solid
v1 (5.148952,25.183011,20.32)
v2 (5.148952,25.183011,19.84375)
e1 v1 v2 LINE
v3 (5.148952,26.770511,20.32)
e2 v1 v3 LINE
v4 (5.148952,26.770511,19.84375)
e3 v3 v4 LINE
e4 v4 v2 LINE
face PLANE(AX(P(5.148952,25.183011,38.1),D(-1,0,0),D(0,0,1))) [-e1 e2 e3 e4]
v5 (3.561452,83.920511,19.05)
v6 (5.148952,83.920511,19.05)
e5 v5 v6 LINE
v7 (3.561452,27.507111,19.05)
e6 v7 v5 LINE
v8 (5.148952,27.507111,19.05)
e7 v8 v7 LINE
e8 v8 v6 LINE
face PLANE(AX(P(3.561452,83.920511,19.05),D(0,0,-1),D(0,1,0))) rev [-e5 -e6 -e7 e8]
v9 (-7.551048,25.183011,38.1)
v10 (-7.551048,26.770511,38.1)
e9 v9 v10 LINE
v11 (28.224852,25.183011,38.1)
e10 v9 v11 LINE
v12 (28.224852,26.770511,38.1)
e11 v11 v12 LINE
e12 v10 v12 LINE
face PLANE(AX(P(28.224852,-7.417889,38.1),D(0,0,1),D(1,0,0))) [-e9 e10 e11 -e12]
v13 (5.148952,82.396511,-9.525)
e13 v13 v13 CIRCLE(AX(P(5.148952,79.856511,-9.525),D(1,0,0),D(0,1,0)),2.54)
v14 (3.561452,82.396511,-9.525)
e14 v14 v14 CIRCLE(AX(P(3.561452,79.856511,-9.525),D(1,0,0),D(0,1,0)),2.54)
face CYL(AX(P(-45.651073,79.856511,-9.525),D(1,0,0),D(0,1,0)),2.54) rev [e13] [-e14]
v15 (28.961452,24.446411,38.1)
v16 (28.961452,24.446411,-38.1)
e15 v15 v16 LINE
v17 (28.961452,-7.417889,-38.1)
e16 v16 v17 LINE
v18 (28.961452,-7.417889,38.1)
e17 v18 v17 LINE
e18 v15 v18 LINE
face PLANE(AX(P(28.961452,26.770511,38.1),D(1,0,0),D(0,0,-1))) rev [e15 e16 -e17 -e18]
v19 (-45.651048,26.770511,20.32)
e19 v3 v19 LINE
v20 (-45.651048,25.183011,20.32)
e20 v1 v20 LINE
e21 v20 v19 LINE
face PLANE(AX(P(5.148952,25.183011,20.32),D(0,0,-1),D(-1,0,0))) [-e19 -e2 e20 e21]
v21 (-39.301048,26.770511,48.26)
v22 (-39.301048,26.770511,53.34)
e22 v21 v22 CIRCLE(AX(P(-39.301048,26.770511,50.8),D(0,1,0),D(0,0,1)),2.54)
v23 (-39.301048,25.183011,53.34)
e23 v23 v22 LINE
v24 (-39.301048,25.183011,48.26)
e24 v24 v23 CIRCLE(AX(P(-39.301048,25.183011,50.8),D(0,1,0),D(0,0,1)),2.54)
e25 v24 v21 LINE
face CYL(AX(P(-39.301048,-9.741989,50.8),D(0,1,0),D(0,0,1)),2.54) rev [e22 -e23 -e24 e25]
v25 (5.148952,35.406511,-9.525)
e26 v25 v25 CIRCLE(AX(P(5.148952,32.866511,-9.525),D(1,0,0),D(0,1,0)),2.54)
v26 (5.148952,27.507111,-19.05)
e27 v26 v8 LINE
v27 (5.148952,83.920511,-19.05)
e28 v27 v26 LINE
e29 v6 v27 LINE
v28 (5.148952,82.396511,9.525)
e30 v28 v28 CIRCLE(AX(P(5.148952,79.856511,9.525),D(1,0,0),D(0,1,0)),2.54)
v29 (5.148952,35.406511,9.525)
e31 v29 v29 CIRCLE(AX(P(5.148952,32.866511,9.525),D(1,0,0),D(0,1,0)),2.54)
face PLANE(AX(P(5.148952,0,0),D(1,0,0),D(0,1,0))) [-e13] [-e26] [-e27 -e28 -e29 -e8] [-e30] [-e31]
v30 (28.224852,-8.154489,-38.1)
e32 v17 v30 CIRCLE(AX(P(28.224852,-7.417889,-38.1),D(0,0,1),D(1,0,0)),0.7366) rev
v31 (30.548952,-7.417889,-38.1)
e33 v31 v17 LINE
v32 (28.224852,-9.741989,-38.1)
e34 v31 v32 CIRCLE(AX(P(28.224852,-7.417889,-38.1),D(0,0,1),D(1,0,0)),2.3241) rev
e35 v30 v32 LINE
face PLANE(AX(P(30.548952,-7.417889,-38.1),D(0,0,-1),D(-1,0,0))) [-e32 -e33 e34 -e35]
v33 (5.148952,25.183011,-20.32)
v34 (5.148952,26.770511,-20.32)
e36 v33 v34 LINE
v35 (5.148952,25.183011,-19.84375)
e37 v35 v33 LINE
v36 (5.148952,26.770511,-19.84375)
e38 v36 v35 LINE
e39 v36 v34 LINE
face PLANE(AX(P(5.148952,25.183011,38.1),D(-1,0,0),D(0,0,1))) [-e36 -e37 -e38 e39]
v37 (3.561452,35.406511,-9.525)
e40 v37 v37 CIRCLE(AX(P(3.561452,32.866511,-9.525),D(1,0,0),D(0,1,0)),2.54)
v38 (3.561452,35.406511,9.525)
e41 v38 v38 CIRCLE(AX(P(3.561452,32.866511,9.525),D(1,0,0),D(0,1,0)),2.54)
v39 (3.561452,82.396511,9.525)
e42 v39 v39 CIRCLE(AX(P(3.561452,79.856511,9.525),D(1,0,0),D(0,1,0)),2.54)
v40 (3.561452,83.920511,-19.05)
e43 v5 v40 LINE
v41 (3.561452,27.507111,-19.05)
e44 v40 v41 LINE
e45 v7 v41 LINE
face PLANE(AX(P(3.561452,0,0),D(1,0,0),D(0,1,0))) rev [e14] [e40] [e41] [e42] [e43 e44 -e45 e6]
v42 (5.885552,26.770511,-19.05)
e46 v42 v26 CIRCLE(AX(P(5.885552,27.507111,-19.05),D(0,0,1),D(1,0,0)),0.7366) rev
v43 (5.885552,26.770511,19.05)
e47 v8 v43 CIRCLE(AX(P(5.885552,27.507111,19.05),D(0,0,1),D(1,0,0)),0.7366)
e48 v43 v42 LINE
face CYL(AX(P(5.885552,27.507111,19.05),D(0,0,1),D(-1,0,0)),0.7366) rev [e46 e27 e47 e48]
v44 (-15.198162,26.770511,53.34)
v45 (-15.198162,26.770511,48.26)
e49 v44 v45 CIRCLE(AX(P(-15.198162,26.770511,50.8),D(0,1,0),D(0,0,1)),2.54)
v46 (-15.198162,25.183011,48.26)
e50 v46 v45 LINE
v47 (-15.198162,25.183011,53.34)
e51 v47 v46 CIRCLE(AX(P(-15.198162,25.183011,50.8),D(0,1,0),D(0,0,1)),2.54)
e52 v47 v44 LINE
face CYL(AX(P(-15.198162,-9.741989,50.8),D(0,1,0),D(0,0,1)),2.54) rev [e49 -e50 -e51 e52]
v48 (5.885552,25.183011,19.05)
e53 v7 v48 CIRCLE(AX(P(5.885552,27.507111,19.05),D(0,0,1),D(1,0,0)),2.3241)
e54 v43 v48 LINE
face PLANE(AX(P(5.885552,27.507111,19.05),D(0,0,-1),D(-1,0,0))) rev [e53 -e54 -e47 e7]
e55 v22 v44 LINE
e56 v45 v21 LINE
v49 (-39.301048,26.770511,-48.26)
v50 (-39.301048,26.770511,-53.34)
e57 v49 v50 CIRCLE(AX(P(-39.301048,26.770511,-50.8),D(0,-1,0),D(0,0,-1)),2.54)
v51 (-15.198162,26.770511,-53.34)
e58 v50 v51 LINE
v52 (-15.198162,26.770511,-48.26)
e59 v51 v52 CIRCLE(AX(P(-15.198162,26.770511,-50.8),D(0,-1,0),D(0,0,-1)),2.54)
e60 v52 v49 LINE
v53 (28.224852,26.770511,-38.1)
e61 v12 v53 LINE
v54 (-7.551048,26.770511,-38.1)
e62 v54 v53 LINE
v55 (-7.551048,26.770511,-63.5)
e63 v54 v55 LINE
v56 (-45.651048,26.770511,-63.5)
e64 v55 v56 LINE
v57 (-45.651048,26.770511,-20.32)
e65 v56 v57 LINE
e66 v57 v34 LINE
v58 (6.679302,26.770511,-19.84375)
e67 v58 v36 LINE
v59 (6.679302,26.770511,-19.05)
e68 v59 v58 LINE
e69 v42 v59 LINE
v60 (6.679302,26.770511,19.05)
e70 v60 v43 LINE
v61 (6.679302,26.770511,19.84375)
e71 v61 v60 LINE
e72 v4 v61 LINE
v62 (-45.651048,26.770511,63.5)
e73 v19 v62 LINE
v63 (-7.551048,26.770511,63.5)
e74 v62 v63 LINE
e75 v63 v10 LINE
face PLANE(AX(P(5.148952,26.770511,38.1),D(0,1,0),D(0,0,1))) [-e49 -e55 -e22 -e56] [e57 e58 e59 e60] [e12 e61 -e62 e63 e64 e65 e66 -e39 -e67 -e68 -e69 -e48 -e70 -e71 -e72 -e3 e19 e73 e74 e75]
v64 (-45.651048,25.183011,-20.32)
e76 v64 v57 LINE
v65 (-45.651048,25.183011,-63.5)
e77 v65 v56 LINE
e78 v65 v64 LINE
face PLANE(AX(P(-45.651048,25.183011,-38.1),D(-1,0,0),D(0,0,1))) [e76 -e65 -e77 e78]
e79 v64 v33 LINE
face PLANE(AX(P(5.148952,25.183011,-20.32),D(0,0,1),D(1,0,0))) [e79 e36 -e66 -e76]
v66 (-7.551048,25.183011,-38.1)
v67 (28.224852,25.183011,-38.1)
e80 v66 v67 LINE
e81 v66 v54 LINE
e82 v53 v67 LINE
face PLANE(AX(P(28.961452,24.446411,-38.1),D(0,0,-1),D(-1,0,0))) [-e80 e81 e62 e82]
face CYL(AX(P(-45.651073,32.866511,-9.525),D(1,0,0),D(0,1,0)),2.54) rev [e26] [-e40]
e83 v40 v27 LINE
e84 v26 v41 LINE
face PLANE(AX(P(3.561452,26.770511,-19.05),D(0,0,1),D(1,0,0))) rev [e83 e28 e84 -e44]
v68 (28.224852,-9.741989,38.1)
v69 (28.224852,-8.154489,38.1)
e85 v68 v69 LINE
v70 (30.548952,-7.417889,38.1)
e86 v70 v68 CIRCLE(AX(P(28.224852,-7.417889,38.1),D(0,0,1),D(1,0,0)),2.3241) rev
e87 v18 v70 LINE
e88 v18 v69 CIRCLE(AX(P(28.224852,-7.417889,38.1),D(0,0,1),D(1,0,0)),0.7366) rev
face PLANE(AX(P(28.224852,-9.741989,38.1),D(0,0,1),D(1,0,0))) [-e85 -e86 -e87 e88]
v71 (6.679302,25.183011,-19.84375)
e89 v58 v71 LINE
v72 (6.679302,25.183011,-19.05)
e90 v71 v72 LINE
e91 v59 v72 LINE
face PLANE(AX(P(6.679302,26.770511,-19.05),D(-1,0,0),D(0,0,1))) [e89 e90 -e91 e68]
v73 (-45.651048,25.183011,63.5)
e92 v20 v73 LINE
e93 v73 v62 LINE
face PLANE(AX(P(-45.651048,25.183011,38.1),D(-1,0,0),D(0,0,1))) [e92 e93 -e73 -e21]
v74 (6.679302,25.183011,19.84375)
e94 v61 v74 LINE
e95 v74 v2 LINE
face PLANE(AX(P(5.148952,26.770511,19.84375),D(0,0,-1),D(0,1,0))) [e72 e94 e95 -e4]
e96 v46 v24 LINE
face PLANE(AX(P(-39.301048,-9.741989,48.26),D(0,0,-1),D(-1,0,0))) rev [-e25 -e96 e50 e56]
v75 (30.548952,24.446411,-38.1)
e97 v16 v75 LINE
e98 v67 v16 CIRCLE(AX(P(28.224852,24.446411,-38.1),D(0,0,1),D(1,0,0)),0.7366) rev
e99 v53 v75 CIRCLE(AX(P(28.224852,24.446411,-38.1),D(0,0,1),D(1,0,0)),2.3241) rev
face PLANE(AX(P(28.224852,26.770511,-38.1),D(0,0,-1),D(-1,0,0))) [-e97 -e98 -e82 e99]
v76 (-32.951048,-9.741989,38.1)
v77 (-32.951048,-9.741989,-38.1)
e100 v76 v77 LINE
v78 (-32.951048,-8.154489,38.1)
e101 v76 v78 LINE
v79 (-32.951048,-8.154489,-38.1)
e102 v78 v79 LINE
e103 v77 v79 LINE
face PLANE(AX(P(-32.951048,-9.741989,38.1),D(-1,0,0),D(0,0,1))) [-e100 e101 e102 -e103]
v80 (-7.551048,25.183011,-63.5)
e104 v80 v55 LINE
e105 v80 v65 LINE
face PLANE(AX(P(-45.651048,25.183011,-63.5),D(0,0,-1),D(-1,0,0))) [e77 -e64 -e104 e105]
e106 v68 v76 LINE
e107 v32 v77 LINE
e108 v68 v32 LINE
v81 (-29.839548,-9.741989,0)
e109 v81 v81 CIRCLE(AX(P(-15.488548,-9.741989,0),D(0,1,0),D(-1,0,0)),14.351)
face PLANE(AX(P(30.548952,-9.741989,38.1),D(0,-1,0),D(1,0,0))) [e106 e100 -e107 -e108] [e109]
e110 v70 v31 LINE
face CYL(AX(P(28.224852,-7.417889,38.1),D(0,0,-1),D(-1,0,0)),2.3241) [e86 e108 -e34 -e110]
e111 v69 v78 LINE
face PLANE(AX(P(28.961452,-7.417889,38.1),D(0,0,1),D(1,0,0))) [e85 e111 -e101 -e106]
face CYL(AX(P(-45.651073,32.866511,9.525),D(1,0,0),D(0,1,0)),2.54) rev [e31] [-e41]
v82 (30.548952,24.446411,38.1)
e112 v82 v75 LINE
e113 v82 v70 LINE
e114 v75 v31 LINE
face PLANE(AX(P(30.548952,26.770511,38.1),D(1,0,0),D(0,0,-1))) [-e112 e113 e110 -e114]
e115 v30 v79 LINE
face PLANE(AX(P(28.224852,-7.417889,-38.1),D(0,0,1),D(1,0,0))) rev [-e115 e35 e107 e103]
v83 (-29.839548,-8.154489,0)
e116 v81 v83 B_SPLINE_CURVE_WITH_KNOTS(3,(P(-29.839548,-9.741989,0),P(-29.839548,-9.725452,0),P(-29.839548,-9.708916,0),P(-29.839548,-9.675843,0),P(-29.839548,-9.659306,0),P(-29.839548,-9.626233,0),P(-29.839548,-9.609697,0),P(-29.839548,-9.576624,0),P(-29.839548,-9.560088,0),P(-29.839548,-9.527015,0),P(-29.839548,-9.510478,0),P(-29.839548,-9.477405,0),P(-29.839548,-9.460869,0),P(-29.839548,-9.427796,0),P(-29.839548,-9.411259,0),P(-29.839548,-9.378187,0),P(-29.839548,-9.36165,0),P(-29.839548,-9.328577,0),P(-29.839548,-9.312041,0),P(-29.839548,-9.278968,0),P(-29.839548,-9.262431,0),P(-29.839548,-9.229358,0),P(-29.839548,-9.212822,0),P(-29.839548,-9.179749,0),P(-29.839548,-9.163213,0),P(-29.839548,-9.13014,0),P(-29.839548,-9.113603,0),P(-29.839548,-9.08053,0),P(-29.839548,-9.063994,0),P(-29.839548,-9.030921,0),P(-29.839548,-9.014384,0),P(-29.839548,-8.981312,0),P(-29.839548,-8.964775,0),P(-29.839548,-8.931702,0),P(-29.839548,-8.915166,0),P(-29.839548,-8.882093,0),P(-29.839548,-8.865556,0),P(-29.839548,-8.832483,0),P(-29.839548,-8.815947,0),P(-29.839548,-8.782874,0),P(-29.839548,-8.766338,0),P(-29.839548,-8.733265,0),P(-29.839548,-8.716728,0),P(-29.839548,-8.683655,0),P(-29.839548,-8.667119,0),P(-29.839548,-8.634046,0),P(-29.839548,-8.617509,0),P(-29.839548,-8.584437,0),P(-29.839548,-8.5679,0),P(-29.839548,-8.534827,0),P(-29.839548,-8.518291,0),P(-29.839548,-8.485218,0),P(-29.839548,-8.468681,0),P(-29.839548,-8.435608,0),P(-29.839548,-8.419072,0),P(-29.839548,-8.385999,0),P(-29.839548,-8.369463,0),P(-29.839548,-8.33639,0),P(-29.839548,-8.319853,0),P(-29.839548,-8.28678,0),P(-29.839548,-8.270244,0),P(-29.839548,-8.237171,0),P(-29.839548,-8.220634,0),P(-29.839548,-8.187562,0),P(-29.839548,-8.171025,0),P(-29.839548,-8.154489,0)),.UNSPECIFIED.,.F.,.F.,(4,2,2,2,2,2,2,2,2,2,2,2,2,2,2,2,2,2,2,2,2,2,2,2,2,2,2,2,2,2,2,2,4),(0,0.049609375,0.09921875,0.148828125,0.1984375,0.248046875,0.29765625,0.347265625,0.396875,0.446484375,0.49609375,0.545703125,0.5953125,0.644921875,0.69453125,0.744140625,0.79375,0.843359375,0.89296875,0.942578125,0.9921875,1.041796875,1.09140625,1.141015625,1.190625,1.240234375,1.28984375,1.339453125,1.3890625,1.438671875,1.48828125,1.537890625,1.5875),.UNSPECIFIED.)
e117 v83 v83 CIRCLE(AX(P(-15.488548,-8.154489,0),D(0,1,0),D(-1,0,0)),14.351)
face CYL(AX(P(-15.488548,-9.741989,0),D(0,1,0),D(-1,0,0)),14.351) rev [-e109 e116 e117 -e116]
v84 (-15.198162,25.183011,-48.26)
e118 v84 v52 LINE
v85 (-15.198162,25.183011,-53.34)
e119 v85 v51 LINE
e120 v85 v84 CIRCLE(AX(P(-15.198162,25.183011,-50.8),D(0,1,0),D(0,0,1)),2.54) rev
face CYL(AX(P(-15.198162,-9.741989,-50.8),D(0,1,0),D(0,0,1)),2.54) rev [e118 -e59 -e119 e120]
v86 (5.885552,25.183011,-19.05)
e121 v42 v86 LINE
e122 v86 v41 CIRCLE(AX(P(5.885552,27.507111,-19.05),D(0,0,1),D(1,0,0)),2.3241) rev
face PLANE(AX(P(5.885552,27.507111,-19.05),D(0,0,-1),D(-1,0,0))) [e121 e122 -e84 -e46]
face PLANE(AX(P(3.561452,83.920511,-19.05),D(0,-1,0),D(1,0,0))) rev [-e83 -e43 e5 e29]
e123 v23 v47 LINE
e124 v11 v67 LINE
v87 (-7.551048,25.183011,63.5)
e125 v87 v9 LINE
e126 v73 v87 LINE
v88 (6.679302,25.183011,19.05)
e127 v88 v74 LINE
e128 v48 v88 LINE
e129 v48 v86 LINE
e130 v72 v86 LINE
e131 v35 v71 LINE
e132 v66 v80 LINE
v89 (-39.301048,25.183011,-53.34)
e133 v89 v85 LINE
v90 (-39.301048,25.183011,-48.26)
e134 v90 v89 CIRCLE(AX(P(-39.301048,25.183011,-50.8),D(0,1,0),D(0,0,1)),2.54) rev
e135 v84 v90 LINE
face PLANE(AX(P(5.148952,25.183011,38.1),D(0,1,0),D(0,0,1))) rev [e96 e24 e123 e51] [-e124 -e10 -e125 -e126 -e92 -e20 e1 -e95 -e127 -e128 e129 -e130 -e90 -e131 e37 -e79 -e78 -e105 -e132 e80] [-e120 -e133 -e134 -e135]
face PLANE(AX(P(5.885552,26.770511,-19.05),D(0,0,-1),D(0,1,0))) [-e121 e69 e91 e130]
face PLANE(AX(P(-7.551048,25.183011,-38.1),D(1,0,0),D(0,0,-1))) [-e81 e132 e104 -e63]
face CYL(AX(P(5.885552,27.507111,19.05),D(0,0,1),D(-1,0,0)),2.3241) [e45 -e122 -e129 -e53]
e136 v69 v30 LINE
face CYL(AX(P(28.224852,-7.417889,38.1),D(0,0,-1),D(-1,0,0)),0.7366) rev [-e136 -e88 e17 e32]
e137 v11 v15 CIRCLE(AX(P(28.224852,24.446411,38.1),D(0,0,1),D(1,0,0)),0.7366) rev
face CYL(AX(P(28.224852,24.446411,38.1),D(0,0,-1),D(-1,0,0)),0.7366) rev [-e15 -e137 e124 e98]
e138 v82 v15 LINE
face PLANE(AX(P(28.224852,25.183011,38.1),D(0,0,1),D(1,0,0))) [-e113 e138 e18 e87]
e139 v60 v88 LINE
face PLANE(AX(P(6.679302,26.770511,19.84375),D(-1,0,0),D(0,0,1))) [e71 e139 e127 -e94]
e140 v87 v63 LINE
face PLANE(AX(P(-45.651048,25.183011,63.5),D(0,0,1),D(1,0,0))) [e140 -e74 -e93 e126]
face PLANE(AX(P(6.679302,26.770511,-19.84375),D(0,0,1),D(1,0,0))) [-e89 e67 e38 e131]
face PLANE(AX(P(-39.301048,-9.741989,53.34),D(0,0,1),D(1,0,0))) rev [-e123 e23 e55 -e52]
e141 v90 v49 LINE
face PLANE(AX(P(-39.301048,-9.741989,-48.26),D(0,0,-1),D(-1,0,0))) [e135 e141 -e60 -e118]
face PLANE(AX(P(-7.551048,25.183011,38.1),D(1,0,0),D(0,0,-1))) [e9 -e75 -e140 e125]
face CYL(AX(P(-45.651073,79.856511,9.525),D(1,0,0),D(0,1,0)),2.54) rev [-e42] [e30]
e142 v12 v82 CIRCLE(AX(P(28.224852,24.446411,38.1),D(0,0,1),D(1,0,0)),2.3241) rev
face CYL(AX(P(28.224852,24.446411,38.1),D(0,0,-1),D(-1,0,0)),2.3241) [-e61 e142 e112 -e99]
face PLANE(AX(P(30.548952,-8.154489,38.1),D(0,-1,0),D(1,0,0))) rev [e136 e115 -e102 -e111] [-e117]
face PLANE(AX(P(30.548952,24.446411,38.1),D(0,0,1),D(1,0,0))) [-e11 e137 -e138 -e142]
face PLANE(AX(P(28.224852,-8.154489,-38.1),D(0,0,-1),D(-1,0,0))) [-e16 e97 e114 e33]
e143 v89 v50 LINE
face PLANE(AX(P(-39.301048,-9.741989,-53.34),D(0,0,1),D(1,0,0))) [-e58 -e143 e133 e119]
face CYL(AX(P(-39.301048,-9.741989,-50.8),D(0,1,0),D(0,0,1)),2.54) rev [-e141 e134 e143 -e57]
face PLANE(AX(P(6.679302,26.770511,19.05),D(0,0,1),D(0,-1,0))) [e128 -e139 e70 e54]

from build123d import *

# Parameters (mm, degrees)
BASE_FLANGE1_DEPTH            = 38.1
SKETCH4_W                     = 50.8
SKETCH4_H                     = 17.78
TAB1_DEPTH                    = 1.5875
SKETCH5_W                     = 50.8
SKETCH5_H                     = 17.78
TAB2_DEPTH                    = 1.5875
EDGE_FLANGE4_STRIP_W          = 7.8232
EDGE_FLANGE4_STRIP_H          = 1.5875
EDGE_FLANGE4_STRIP_CUT_DEPTH  = 38.1
EDGE_FLANGE4_RELIEF_W         = 8.61695
EDGE_FLANGE4_RELIEF_H         = 0.79375
EDGE_FLANGE4_RELIEF_CUT_DEPTH = 1.5875
EDGE_FLANGE4_DEPTH            = 38.1
SKETCH18_R                    = 14.351
CUT_EXTRUDE1_DEPTH            = 110.605811015
SKETCH19_W                    = 38.1
SKETCH19_H                    = 25.4
TAB3_DEPTH                    = 1.5875
SKETCH20_W                    = 38.1
SKETCH20_H                    = 25.4
TAB4_DEPTH                    = 1.5875
SKETCH21_R                    = 2.54
CUT_EXTRUDE2_DEPTH            = 117.856930597
CUT_EXTRUDE4_DEPTH            = 97.862741461


# Sheet-metal steps are written as plain solids
with BuildPart() as part:
    # Sketch1 → Base-Flange1 (new, symmetric)
    with BuildSketch(Plane.XY):
        with BuildLine():
            Line((5.148952002, 26.77051137), (28.224852002, 26.77051137))
            ThreePointArc((28.224852002, 26.77051137), (29.868238872, 26.08979824), (30.548952002, 24.44641137))
            Line((30.548952002, 24.44641137), (30.548952002, -7.41788863))
            ThreePointArc((30.548952002, -7.41788863), (29.868238872, -9.061275501), (28.224852002, -9.74198863))
            Line((28.224852002, -9.74198863), (-32.951047998, -9.74198863))
            Line((-32.951047998, -9.74198863), (-32.951047998, -8.15448863))
            Line((-32.951047998, -8.15448863), (28.224852002, -8.15448863))
            ThreePointArc((28.224852002, -8.15448863), (28.745706857, -7.938743485), (28.961452002, -7.41788863))
            Line((28.961452002, -7.41788863), (28.961452002, 24.44641137))
            ThreePointArc((28.961452002, 24.44641137), (28.745706857, 24.967266225), (28.224852002, 25.18301137))
            Line((28.224852002, 25.18301137), (5.148952002, 25.18301137))
            Line((5.148952002, 25.18301137), (5.148952002, 26.77051137))
        make_face()
    extrude(amount=BASE_FLANGE1_DEPTH, both=True)

    # Sketch4 → Tab1 (add)
    with BuildSketch(Plane(origin=(0, 26.77051137, 0), x_dir=(1, 0, 0), z_dir=(0, 1, 0))):
        with Locations((-20.251047998, -29.21)):
            Rectangle(SKETCH4_W, SKETCH4_H)
    extrude(amount=-TAB1_DEPTH)

    # Sketch5 → Tab2 (add)
    with BuildSketch(Plane(origin=(0, 26.77051137, 0), x_dir=(1, 0, 0), z_dir=(0, 1, 0))):
        with Locations((-20.251047998, 29.21)):
            Rectangle(SKETCH5_W, SKETCH5_H)
    extrude(amount=-TAB2_DEPTH)

    # Edge-Flange4 strip (across the edge) → Edge-Flange4 strip cut (cut)
    with BuildSketch(Plane(origin=(5.148952002, 26.77051137, -19.05), x_dir=(1, 0, 0), z_dir=(0, 0, 1))):
        with Locations((-3.175, -0.79375)):
            Rectangle(EDGE_FLANGE4_STRIP_W, EDGE_FLANGE4_STRIP_H)
    extrude(amount=EDGE_FLANGE4_STRIP_CUT_DEPTH, mode=Mode.SUBTRACT)

    # Edge-Flange4 relief (on the sheet) → Edge-Flange4 relief cut (cut)
    with BuildSketch(Plane(origin=(5.885552002, 26.77051137, -19.05), x_dir=(1, 0, 0), z_dir=(0, 1, 0))):
        with Locations((-3.514725, 0.396875)):
            Rectangle(EDGE_FLANGE4_RELIEF_W, EDGE_FLANGE4_RELIEF_H)
        with Locations((-3.514725, -38.496875)):
            Rectangle(EDGE_FLANGE4_RELIEF_W, EDGE_FLANGE4_RELIEF_H)
    extrude(amount=-EDGE_FLANGE4_RELIEF_CUT_DEPTH, mode=Mode.SUBTRACT)

    # Edge-Flange4 section (across the edge) → Edge-Flange4 (add)
    with BuildSketch(Plane(origin=(5.148952002, 26.77051137, -19.05), x_dir=(1, 0, 0), z_dir=(0, 0, 1))):
        with BuildLine():
            Line((-1.5875, 0.7366), (-1.5875, 57.15))
            Line((-1.5875, 57.15), (0, 57.15))
            Line((0, 57.15), (0, 0.7366))
            ThreePointArc((0, 0.7366), (0.215745145, 0.215745145), (0.7366, 0))
            Line((0.7366, 0), (0.7366, -1.5875))
            ThreePointArc((0.7366, -1.5875), (-0.90678687, -0.90678687), (-1.5875, 0.7366))
        make_face()
    extrude(amount=EDGE_FLANGE4_DEPTH)

    # Sketch18 → Cut-Extrude1 (cut, through all)
    with BuildSketch(Plane(origin=(0, -8.15448863, 0), x_dir=(1, 0, 0), z_dir=(0, 1, 0))):
        with Locations(Location((-15.488547998, 0, 0), (0, 0, 180))):
            Circle(SKETCH18_R)
    extrude(amount=-CUT_EXTRUDE1_DEPTH, mode=Mode.SUBTRACT)

    # Sketch19 → Tab3 (add)
    with BuildSketch(Plane(origin=(0, 26.77051137, 0), x_dir=(1, 0, 0), z_dir=(0, 1, 0))):
        with Locations((-26.601047998, -50.8)):
            Rectangle(SKETCH19_W, SKETCH19_H)
    extrude(amount=-TAB3_DEPTH)

    # Sketch20 → Tab4 (add)
    with BuildSketch(Plane(origin=(0, 26.77051137, 0), x_dir=(1, 0, 0), z_dir=(0, 1, 0))):
        with Locations((-26.601047998, 50.8)):
            Rectangle(SKETCH20_W, SKETCH20_H)
    extrude(amount=-TAB4_DEPTH)

    # Sketch21 → Cut-Extrude2 (cut, through all)
    with BuildSketch(Plane(origin=(5.148952002, 0, 0), x_dir=(0, 0, -1), z_dir=(1, 0, 0))):
        with Locations(Location((-9.525, 32.86651137, 0), (0, 0, 90))):
            Circle(SKETCH21_R)
        with Locations(Location((9.525, 32.86651137, 0), (0, 0, 90))):
            Circle(SKETCH21_R)
        with Locations(Location((-9.525, 79.85651137, 0), (0, 0, 90))):
            Circle(SKETCH21_R)
        with Locations(Location((9.525, 79.85651137, 0), (0, 0, 90))):
            Circle(SKETCH21_R)
    extrude(amount=-CUT_EXTRUDE2_DEPTH, mode=Mode.SUBTRACT)

    # Sketch24 → Cut-Extrude4 (cut, through all)
    with BuildSketch(Plane(origin=(0, 26.77051137, 0), x_dir=(1, 0, 0), z_dir=(0, 1, 0))):
        with BuildLine():
            Line((-39.301047998, -48.26), (-15.19816231, -48.26))
            ThreePointArc((-15.19816231, -48.26), (-12.65816231, -50.8), (-15.19816231, -53.34))
            Line((-15.19816231, -53.34), (-39.301047998, -53.34))
            ThreePointArc((-39.301047998, -53.34), (-41.841047998, -50.8), (-39.301047998, -48.26))
        make_face()
    cut_extrude4 = extrude(amount=-CUT_EXTRUDE4_DEPTH, mode=Mode.SUBTRACT)

    # Mirror1: Cut-Extrude4 across plane
    add(cut_extrude4.mirror(Plane.XY), mode=Mode.SUBTRACT)


solid = part.part
